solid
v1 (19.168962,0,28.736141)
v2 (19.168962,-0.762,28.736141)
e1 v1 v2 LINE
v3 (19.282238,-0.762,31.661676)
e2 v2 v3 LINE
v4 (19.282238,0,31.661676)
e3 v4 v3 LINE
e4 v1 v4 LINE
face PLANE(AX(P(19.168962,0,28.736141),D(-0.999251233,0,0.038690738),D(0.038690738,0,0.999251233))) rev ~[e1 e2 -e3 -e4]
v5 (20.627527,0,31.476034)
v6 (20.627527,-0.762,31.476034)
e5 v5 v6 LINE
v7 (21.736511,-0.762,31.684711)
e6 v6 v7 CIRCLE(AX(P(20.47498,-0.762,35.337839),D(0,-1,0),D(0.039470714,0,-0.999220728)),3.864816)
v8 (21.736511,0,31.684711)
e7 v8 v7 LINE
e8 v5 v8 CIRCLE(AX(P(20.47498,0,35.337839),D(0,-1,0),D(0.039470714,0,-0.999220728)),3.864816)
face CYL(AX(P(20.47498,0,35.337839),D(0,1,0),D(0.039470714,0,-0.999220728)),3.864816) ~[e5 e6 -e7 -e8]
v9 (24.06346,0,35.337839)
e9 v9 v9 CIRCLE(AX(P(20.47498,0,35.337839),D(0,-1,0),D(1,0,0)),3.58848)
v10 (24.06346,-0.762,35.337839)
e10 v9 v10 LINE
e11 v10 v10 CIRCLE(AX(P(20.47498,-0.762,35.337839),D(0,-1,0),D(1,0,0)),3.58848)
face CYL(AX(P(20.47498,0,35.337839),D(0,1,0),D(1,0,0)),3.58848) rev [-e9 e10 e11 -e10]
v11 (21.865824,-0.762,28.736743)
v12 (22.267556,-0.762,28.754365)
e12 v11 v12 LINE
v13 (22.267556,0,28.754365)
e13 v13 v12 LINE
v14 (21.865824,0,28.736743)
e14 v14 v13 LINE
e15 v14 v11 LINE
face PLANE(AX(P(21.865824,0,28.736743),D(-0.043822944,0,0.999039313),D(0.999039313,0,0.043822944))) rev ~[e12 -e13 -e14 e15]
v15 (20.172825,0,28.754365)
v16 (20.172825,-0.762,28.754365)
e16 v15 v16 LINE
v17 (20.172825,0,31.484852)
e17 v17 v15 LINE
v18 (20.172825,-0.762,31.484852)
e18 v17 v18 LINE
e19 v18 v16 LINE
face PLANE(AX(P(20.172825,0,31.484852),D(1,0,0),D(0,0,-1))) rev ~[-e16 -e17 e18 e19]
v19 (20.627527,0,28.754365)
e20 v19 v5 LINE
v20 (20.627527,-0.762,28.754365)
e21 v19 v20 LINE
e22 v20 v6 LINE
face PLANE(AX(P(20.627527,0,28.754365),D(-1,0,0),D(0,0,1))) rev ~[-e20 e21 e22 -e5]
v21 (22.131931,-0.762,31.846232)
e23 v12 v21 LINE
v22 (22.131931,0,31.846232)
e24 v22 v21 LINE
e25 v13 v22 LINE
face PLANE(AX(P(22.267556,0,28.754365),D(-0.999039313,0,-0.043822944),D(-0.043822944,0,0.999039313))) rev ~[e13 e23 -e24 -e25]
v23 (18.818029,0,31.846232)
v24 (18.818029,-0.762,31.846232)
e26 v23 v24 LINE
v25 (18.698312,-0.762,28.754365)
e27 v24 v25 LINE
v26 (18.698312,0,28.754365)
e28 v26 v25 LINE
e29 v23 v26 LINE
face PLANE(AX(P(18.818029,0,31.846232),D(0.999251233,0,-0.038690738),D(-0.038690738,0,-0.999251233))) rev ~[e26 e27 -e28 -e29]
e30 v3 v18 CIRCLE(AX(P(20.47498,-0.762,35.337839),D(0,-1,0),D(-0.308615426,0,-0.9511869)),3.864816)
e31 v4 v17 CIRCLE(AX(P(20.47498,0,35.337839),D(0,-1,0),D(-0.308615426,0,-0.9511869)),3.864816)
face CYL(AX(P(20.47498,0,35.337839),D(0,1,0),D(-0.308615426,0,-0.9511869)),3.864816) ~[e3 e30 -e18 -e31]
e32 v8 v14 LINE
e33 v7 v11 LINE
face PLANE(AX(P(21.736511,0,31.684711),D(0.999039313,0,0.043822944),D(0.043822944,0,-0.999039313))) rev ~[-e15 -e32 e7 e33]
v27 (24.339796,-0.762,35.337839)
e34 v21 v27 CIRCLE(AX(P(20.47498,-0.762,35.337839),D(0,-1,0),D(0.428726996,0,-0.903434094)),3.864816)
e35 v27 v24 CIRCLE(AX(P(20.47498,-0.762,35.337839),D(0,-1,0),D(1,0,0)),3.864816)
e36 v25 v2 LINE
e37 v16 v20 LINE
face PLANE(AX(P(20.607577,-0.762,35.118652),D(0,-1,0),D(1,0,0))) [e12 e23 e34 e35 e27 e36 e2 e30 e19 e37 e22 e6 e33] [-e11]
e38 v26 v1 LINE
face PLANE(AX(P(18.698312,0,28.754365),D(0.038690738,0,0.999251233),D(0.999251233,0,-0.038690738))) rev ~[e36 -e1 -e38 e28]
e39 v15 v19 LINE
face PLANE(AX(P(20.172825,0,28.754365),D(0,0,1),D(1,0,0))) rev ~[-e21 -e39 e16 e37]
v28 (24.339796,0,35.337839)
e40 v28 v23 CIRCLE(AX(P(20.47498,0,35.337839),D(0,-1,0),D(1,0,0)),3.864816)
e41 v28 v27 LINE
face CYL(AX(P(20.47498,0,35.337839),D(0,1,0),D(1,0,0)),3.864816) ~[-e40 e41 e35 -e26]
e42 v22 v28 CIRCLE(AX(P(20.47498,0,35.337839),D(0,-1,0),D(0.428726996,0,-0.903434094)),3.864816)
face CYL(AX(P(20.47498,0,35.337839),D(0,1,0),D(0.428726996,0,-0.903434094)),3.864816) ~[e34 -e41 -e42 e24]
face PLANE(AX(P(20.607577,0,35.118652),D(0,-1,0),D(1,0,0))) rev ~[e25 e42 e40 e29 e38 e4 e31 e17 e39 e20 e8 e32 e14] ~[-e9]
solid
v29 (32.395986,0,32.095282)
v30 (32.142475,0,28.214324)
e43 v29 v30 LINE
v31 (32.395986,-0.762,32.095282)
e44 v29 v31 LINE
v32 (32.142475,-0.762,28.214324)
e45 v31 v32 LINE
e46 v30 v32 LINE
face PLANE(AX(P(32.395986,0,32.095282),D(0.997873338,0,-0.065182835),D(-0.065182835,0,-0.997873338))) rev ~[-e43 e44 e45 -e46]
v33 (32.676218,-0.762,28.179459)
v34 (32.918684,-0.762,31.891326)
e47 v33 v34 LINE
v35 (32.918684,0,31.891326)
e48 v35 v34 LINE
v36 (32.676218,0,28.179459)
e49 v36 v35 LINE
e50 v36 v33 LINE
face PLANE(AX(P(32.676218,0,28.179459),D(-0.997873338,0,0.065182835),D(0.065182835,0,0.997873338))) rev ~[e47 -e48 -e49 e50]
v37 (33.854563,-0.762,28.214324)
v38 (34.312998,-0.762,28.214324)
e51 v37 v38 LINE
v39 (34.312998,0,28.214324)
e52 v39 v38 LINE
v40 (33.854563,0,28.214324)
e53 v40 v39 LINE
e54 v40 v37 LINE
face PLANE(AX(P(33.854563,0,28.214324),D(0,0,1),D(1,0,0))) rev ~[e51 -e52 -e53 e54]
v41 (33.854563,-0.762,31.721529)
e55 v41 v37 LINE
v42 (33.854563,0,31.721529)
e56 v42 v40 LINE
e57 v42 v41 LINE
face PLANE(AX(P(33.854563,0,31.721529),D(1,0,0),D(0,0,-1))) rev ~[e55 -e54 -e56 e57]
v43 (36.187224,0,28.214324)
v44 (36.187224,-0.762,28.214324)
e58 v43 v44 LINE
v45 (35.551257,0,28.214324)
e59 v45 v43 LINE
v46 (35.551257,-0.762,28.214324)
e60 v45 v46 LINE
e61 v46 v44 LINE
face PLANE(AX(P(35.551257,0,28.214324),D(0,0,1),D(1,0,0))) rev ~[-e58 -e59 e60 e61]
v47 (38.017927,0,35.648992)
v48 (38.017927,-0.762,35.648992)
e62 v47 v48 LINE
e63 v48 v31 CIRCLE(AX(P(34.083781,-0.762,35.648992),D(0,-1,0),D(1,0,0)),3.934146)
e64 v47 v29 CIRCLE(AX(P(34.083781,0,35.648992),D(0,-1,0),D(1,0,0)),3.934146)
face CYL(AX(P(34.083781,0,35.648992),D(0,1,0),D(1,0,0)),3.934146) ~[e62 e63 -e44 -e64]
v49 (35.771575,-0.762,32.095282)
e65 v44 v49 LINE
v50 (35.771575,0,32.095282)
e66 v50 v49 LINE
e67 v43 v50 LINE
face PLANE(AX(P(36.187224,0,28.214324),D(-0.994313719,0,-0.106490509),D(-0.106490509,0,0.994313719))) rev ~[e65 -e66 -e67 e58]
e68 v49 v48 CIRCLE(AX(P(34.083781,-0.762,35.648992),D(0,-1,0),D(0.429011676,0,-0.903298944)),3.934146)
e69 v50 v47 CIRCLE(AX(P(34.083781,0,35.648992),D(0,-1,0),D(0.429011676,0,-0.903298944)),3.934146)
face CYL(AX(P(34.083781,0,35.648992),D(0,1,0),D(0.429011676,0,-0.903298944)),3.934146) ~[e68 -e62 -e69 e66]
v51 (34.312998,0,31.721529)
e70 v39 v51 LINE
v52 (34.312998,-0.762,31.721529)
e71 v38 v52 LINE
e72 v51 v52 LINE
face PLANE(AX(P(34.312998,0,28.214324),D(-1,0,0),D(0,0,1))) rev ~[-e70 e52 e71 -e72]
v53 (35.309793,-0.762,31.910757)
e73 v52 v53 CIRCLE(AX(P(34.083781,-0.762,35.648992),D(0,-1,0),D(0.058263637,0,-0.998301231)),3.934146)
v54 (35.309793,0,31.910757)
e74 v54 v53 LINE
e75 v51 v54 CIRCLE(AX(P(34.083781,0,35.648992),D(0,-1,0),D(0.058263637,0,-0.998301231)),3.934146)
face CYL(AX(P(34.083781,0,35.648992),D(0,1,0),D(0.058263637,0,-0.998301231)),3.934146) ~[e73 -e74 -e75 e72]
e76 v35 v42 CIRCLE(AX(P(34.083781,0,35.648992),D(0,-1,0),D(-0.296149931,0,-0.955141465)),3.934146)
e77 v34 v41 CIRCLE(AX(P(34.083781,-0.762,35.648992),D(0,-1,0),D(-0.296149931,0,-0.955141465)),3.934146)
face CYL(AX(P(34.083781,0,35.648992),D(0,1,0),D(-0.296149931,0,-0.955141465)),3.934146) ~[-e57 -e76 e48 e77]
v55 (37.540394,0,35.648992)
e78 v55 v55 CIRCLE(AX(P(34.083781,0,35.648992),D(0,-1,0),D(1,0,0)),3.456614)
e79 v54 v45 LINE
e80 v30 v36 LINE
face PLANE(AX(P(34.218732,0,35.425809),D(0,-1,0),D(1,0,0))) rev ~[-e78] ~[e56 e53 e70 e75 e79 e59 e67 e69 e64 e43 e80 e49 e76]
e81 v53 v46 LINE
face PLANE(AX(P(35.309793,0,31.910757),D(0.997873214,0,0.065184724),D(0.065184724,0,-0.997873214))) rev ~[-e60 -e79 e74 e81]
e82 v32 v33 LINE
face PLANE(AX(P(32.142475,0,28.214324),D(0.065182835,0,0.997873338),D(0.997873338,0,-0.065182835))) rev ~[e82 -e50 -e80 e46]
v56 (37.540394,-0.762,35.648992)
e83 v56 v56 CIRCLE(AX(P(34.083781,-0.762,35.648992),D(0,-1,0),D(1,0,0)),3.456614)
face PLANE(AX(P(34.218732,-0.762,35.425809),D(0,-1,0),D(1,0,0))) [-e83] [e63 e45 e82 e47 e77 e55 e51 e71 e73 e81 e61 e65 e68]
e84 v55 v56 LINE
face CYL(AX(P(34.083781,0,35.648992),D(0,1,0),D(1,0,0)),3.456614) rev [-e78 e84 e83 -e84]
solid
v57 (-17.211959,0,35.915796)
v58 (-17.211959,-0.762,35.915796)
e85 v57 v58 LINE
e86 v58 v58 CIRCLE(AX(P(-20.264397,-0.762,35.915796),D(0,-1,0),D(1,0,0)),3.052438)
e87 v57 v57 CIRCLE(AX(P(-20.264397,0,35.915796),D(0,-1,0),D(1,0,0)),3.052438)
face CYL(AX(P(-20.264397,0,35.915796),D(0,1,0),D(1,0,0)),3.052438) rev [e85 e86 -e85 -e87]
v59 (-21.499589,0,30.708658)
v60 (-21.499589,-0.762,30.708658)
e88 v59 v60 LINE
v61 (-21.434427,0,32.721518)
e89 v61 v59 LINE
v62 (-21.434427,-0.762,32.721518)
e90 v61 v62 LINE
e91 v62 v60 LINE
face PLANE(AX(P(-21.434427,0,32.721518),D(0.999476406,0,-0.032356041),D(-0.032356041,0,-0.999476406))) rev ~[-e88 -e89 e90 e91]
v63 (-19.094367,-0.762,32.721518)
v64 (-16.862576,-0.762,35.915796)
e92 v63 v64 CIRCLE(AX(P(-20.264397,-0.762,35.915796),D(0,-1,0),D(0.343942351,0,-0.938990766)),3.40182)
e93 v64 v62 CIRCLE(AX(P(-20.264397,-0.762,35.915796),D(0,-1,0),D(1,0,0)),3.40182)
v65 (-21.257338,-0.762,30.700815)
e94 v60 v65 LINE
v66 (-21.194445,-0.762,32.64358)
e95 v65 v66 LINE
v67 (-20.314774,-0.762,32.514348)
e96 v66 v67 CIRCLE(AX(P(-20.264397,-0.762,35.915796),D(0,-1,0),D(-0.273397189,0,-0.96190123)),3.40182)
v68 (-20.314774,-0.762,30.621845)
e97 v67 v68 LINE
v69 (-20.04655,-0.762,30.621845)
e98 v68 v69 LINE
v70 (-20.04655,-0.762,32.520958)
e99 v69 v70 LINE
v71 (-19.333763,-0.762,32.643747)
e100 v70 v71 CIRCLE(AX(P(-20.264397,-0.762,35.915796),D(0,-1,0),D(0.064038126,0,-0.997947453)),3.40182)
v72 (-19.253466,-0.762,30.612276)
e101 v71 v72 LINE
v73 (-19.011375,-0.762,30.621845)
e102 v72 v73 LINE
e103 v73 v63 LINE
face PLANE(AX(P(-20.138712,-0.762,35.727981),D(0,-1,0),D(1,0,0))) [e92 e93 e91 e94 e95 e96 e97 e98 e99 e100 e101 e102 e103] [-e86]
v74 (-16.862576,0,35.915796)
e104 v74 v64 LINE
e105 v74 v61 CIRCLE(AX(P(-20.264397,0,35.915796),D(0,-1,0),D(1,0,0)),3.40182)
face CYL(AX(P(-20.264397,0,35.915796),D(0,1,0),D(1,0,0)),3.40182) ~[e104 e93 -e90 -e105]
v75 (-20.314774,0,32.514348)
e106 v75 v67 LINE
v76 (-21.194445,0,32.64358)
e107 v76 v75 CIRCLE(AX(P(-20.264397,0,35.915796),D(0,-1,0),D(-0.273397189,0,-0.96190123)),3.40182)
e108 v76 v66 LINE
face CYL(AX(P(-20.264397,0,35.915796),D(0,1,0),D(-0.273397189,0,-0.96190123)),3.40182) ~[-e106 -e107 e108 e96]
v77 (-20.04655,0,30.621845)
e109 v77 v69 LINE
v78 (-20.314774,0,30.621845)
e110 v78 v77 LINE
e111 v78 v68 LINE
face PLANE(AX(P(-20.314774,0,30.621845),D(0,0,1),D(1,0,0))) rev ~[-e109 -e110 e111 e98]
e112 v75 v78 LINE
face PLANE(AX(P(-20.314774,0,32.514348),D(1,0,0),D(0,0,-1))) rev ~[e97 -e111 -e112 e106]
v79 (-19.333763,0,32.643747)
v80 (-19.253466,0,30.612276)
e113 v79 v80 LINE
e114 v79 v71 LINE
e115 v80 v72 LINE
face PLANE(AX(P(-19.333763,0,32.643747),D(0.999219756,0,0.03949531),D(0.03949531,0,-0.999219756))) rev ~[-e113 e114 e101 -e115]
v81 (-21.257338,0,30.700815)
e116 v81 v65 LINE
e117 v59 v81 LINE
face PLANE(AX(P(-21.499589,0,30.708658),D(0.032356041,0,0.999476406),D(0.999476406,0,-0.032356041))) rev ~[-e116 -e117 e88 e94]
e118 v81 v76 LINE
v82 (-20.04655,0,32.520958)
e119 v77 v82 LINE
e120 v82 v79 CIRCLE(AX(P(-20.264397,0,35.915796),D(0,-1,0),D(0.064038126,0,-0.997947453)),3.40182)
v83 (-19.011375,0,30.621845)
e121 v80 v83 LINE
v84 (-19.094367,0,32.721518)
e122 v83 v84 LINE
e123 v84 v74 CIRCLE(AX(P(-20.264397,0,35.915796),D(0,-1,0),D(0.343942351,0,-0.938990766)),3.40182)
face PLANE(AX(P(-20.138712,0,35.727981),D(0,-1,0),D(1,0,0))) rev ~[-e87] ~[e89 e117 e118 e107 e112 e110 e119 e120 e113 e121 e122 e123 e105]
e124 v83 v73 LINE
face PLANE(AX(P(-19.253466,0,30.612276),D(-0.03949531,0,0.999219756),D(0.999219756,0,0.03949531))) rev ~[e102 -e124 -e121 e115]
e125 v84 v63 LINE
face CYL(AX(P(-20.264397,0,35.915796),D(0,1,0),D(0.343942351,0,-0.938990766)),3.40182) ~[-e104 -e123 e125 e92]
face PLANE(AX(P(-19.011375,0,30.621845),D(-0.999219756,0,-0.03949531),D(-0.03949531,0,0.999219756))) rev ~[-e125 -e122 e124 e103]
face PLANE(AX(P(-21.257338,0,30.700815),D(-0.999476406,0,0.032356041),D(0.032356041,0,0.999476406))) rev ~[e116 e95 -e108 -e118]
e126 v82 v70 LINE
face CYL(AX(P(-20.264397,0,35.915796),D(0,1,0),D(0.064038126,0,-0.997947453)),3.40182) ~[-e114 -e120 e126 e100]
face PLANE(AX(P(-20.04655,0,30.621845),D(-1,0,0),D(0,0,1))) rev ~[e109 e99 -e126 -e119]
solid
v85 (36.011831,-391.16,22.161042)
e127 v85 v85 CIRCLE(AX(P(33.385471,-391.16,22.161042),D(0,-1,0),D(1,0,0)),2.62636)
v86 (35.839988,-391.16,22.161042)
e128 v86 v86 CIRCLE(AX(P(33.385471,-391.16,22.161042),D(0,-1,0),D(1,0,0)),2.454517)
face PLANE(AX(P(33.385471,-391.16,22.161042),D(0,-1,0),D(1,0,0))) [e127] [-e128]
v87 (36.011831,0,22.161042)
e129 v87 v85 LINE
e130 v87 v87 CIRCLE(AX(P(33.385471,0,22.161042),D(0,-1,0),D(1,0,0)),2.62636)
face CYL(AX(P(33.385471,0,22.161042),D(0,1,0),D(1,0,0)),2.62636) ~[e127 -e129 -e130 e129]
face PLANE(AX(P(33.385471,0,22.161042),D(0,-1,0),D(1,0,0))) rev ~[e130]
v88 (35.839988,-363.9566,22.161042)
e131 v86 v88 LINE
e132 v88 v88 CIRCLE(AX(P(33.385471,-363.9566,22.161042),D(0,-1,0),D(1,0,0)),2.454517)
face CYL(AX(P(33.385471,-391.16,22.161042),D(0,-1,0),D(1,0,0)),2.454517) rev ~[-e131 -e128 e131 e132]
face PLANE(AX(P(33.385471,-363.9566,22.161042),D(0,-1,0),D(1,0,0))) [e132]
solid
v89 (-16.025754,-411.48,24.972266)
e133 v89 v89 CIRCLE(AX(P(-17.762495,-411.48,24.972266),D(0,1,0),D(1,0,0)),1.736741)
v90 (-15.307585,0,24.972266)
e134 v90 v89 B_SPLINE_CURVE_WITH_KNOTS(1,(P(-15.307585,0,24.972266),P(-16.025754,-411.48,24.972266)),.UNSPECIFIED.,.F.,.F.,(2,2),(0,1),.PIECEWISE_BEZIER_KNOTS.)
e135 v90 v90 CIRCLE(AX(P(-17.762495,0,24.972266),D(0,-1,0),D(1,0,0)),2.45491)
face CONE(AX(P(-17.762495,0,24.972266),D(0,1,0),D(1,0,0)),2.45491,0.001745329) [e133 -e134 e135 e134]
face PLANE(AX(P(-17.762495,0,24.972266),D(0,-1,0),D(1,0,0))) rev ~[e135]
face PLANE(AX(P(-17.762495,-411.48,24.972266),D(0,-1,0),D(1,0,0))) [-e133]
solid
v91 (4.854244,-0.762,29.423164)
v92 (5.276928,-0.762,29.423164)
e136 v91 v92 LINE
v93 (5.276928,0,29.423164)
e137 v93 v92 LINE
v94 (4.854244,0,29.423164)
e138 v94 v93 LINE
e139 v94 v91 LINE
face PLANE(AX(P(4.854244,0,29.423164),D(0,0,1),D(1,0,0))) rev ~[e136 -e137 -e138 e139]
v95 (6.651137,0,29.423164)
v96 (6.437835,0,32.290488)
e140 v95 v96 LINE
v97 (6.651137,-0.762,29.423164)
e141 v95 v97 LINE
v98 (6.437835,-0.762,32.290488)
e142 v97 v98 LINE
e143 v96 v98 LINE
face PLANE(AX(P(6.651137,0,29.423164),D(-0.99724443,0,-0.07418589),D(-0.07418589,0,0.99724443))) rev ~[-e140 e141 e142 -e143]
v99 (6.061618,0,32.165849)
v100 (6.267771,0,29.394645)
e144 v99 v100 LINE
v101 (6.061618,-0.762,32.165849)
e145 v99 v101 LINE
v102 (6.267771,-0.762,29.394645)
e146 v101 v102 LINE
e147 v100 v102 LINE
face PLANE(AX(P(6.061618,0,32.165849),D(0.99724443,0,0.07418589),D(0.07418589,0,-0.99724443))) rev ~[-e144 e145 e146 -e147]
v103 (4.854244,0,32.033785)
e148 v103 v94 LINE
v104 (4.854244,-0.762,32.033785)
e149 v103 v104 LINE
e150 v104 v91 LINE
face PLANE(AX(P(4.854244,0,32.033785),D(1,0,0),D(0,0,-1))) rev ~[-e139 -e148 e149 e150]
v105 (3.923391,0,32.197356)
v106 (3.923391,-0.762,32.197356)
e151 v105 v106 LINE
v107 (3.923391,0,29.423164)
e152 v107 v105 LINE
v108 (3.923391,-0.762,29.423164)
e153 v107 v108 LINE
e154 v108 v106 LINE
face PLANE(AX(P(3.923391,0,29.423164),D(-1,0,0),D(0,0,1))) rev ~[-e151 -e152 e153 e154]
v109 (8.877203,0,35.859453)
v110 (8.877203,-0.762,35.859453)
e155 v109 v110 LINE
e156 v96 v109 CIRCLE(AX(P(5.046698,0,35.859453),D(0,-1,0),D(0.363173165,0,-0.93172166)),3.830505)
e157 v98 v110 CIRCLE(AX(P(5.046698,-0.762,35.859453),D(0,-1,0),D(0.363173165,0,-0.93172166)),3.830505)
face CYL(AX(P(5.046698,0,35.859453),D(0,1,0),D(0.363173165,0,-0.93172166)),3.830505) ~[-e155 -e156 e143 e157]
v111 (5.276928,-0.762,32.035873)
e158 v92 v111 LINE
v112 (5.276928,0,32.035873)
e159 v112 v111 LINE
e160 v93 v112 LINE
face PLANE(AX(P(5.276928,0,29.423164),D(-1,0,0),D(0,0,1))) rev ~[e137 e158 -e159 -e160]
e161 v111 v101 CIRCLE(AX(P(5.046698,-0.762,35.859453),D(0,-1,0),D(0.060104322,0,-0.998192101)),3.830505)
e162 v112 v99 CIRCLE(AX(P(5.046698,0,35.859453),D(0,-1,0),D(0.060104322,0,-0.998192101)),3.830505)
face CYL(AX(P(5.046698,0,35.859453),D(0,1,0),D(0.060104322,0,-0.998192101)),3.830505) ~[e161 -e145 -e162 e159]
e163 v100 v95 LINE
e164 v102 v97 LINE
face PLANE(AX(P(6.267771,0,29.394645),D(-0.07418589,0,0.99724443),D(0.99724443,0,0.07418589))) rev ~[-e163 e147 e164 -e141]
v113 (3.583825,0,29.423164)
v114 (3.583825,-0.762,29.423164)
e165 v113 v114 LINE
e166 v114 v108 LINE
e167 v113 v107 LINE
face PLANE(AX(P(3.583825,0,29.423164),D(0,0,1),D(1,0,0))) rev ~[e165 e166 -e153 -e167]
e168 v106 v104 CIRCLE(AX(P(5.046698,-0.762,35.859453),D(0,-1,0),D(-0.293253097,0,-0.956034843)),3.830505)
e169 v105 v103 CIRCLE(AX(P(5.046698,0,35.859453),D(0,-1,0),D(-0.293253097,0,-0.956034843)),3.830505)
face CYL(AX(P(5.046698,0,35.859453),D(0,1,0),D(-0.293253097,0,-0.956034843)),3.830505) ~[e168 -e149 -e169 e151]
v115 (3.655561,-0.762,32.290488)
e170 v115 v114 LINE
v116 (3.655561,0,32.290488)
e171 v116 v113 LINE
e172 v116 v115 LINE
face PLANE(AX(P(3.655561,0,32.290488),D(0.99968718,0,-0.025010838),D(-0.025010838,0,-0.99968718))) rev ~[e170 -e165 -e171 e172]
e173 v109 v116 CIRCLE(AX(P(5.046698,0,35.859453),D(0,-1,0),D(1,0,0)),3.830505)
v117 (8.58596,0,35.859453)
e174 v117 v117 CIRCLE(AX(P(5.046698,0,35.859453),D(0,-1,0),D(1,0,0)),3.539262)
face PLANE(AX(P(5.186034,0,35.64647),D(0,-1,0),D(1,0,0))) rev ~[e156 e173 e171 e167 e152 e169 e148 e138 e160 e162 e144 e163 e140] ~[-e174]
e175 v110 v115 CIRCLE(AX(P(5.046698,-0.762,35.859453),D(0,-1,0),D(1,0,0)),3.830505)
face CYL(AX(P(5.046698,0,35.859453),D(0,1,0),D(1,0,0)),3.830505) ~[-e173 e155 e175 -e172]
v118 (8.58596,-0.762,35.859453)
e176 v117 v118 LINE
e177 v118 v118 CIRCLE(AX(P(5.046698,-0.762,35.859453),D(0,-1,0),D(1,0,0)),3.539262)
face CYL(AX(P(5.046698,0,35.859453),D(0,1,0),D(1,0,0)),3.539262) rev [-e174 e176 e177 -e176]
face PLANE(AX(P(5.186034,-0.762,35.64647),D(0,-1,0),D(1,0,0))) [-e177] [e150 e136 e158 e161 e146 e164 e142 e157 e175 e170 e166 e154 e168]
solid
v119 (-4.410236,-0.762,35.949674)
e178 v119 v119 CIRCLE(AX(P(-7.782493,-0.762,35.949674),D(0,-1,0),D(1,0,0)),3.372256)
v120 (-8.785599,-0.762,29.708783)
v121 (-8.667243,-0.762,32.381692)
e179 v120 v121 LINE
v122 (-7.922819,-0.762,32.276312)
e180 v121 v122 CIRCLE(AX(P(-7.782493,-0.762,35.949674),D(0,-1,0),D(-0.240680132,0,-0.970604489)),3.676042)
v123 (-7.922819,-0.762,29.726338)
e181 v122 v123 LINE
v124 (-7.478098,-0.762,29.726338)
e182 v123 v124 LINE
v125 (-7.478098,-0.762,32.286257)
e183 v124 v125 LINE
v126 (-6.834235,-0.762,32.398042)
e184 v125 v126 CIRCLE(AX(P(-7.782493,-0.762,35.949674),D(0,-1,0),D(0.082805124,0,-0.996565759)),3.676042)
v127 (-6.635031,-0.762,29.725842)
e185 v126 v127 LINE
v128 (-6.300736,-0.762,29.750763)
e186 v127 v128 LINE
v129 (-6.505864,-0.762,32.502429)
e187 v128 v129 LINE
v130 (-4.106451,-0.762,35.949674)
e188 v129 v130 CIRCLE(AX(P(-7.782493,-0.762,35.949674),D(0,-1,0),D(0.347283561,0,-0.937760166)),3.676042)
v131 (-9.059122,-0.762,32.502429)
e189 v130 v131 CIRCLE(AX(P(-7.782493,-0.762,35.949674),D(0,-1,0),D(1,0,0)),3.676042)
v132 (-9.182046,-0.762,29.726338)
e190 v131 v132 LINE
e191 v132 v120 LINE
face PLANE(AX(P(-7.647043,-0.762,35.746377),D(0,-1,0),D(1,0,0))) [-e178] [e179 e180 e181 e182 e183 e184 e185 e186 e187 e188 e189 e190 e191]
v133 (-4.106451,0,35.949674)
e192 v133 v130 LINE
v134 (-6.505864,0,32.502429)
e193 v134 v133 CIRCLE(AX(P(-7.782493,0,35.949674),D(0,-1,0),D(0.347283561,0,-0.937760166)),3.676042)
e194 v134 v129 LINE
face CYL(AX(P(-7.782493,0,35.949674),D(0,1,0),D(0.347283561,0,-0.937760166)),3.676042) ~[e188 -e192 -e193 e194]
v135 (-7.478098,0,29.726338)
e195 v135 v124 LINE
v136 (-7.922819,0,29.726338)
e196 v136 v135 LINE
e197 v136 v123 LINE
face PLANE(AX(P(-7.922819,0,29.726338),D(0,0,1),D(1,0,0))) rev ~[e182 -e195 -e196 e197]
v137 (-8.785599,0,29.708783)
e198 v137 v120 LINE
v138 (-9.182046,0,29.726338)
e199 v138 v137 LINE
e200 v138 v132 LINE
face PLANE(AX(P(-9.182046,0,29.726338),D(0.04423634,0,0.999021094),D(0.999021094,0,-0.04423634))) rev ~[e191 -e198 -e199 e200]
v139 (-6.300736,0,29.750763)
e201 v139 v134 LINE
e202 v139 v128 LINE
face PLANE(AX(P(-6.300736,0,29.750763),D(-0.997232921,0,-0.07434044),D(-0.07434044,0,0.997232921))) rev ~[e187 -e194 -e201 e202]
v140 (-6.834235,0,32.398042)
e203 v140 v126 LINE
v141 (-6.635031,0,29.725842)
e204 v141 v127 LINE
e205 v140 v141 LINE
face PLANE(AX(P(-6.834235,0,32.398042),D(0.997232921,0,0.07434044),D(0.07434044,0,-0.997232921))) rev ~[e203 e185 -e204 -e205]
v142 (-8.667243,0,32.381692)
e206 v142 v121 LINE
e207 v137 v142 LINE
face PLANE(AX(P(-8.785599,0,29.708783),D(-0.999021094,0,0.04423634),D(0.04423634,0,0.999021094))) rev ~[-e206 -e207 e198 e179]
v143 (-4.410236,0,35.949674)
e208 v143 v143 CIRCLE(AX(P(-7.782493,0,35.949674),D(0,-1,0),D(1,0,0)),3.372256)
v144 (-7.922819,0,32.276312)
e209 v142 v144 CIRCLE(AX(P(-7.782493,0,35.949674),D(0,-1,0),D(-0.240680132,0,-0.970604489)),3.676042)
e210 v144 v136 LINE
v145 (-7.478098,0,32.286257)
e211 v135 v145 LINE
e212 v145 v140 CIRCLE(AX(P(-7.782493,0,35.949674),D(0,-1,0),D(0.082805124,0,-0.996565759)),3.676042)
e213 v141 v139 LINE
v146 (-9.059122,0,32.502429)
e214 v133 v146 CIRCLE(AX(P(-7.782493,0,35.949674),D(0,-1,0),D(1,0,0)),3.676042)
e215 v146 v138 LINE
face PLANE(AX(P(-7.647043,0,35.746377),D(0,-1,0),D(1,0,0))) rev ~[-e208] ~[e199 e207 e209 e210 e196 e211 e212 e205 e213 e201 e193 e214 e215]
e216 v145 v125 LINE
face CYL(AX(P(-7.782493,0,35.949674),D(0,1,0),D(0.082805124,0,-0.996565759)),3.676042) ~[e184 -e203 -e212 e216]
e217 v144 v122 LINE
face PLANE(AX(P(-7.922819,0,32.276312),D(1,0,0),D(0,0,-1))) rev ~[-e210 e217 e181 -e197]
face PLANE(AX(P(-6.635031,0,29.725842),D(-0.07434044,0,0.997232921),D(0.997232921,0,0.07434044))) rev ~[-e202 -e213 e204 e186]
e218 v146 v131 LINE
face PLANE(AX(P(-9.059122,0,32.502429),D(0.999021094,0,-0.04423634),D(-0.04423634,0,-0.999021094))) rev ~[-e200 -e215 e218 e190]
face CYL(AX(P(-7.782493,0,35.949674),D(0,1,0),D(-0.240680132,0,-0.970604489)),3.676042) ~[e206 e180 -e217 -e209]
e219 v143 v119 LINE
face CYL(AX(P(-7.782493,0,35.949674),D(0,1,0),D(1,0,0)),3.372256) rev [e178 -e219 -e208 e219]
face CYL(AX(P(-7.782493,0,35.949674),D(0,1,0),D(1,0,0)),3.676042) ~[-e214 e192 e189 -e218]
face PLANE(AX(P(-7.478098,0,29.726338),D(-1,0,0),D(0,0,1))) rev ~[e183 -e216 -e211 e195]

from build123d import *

# Parameters (mm, degrees)
F0_R      = 2.62636
F1_DEPTH  = 391.16
F2_R      = 2.4545174693
F3_DEPTH  = 27.2034
F4_R      = 2.45491
F5_DEPTH  = 411.48
F5_TAPER  = 0.1
F6_R      = 3.4566135919
F7_DEPTH  = 0.762
F8_DEPTH  = 0.762
F9_R      = 3.5884802504
F10_DEPTH = 0.762
F11_R     = 3.5392622184
F12_DEPTH = 0.762
F13_R     = 3.3722563351
F14_DEPTH = 0.762
F15_R     = 3.0524378361
F16_DEPTH = 0.762


# Not quite as in the source:
# - a feature names something its author has since deleted; it is built from what else it names


with BuildPart() as f1:
    # F0 (on Front) → F1 (new body)
    with BuildSketch(Plane.XZ):
        with Locations((33.3854705095, 22.1610423177)):
            Circle(F0_R)
    extrude(amount=F1_DEPTH)

    # F2 (on face) → F3 (cut)
    with BuildSketch(Plane.XZ.offset(391.16)):
        with Locations((33.3854705095, 22.1610423177)):
            Circle(F2_R)
    extrude(amount=-F3_DEPTH, mode=Mode.SUBTRACT)


with BuildPart() as f5:
    # F4 (on Front) → F5 (new body)
    with BuildSketch(Plane.XZ):
        with Locations((-17.7624952048, 24.9722655863)):
            Circle(F4_R)
    extrude(amount=F5_DEPTH, taper=F5_TAPER)


with BuildPart() as f7:
    # F6 (on Front) → F7 (new body)
    with BuildSketch(Plane.XZ):
        with BuildLine():
            ThreePointArc((35.7715754489, 32.0952818217), (37.4092534584, 33.5469125299), (38.0179269561, 35.6489918694))
            ThreePointArc((38.0179269561, 35.6489918694), (31.9817014824, 38.974464506), (32.3959861948, 32.0952818217))
            ThreePointArc((32.3959861948, 32.0952818217), (32.6536943465, 31.9839736594), (32.9186837167, 31.8913257664))
            ThreePointArc((32.9186837167, 31.8913257664), (33.3814730836, 31.7780398357), (33.8545631583, 31.7215289391))
            ThreePointArc((33.8545631583, 31.7215289391), (34.0837808218, 31.7148457351), (34.3129984853, 31.7215289391))
            ThreePointArc((34.3129984853, 31.7215289391), (34.817521405, 31.783874722), (35.3097929415, 31.91075698))
            ThreePointArc((35.3097929415, 31.91075698), (35.5436026581, 31.9957158036), (35.7715754489, 32.0952818217))
        make_face()
        with Locations((34.0837808218, 35.6489918694)):
            Circle(F6_R, mode=Mode.SUBTRACT)
    extrude(amount=F7_DEPTH)

    # F6 (on Front) → F8 (join)
    with BuildSketch(Plane.XZ):
        with BuildLine():
            ThreePointArc((35.7715754489, 32.0952818217), (37.4092534584, 33.5469125299), (38.0179269561, 35.6489918694))
            ThreePointArc((38.0179269561, 35.6489918694), (31.9817014824, 38.974464506), (32.3959861948, 32.0952818217))
            ThreePointArc((32.3959861948, 32.0952818217), (32.6536943465, 31.9839736594), (32.9186837167, 31.8913257664))
            ThreePointArc((32.9186837167, 31.8913257664), (33.3814730836, 31.7780398357), (33.8545631583, 31.7215289391))
            ThreePointArc((33.8545631583, 31.7215289391), (34.0837808218, 31.7148457351), (34.3129984853, 31.7215289391))
            ThreePointArc((34.3129984853, 31.7215289391), (34.817521405, 31.783874722), (35.3097929415, 31.91075698))
            ThreePointArc((35.3097929415, 31.91075698), (35.5436026581, 31.9957158036), (35.7715754489, 32.0952818217))
        make_face()
        with Locations((34.0837808218, 35.6489918694)):
            Circle(F6_R, mode=Mode.SUBTRACT)
        with BuildLine():
            ThreePointArc((32.9186837167, 31.8913257664), (32.6536943465, 31.9839736594), (32.3959861948, 32.0952818217))
            Line((32.3959861948, 32.0952818217), (32.1424752474, 28.2143242631))
            Line((32.1424752474, 28.2143242631), (32.6762180922, 28.1794592453))
            Line((32.6762180922, 28.1794592453), (32.9186837167, 31.8913257664))
        make_face()
        with BuildLine():
            ThreePointArc((34.3129984853, 31.7215289391), (34.0837808218, 31.7148457351), (33.8545631583, 31.7215289391))
            Line((33.8545631583, 31.7215289391), (33.8545631583, 28.2143242631))
            Line((33.8545631583, 28.2143242631), (34.3129984853, 28.2143242631))
            Line((34.3129984853, 28.2143242631), (34.3129984853, 31.7215289391))
        make_face()
        with BuildLine():
            Line((36.1872240901, 28.2143242631), (35.7715754489, 32.0952818217))
            ThreePointArc((35.7715754489, 32.0952818217), (35.5436026581, 31.9957158036), (35.3097929415, 31.91075698))
            Line((35.3097929415, 31.91075698), (35.5512574315, 28.2143242631))
            Line((35.5512574315, 28.2143242631), (36.1872240901, 28.2143242631))
        make_face()
    extrude(amount=F8_DEPTH)


with BuildPart() as f10:
    # F9 (on Front) → F10 (new body)
    with BuildSketch(Plane.XZ):
        with BuildLine():
            ThreePointArc((22.1319308048, 31.8462318345), (23.7415235219, 33.2722886782), (24.3397960437, 35.3378386838))
            ThreePointArc((24.3397960437, 35.3378386838), (18.4094296981, 38.6043825019), (18.8180286027, 31.8462318345))
            ThreePointArc((18.8180286027, 31.8462318345), (19.0471481942, 31.7464458452), (19.282237764, 31.6616760097))
            ThreePointArc((19.282237764, 31.6616760097), (19.7223206629, 31.5470195494), (20.1728250831, 31.4848518))
            ThreePointArc((20.1728250831, 31.4848518), (20.4000461089, 31.473748843), (20.6275267627, 31.476034088))
            ThreePointArc((20.6275267627, 31.476034088), (21.1896761466, 31.5396793486), (21.736511169, 31.6847107496))
            ThreePointArc((21.736511169, 31.6847107496), (21.9364540921, 31.7600044292), (22.1319308048, 31.8462318345))
        make_face()
        with Locations((20.4749797037, 35.3378386838)):
            Circle(F9_R, mode=Mode.SUBTRACT)
        with BuildLine():
            Line((22.267555818, 28.7543646982), (22.1319308048, 31.8462318345))
            ThreePointArc((22.1319308048, 31.8462318345), (21.9364540921, 31.7600044292), (21.736511169, 31.6847107496))
            Line((21.736511169, 31.6847107496), (21.8658240366, 28.7367426996))
            Line((21.8658240366, 28.7367426996), (22.267555818, 28.7543646982))
        make_face()
        with BuildLine():
            ThreePointArc((20.6275267627, 31.476034088), (20.4000461089, 31.473748843), (20.1728250831, 31.4848518))
            Line((20.1728250831, 31.4848518), (20.1728250831, 28.7543646982))
            Line((20.1728250831, 28.7543646982), (20.6275267627, 28.7543646982))
            Line((20.6275267627, 28.7543646982), (20.6275267627, 31.476034088))
        make_face()
        with BuildLine():
            ThreePointArc((19.282237764, 31.6616760097), (19.0471481942, 31.7464458452), (18.8180286027, 31.8462318345))
            Line((18.8180286027, 31.8462318345), (18.6983123422, 28.7543646982))
            Line((18.6983123422, 28.7543646982), (19.1689618492, 28.7361412764))
            Line((19.1689618492, 28.7361412764), (19.282237764, 31.6616760097))
        make_face()
    extrude(amount=F10_DEPTH)


with BuildPart() as f12:
    # F11 (on Front) → F12 (new body)
    with BuildSketch(Plane.XZ):
        with BuildLine():
            ThreePointArc((6.4378347425, 32.2904881093), (8.2090963798, 33.6979702133), (8.8772032465, 35.8594527775))
            ThreePointArc((8.8772032465, 35.8594527775), (2.8852154776, 39.0218511155), (3.6555613411, 32.2904881093))
            ThreePointArc((3.6555613411, 32.2904881093), (3.7886138591, 32.2414430605), (3.9233905263, 32.1973563357))
            ThreePointArc((3.9233905263, 32.1973563357), (4.3837529644, 32.0867516301), (4.8542437144, 32.0337853253))
            ThreePointArc((4.8542437144, 32.0337853253), (5.0656146513, 32.0289942821), (5.2769279587, 32.0358727393))
            ThreePointArc((5.2769279587, 32.0358727393), (5.6726558311, 32.0804387567), (6.0616182074, 32.165849228))
            ThreePointArc((6.0616182074, 32.165849228), (6.2513395336, 32.223299728), (6.4378347425, 32.2904881093))
        make_face()
        with Locations((5.0466980418, 35.8594527775)):
            Circle(F11_R, mode=Mode.SUBTRACT)
        with BuildLine():
            ThreePointArc((5.2769279587, 32.0358727393), (5.0656146513, 32.0289942821), (4.8542437144, 32.0337853253))
            Line((4.8542437144, 32.0337853253), (4.8542437144, 29.4231642021))
            Line((4.8542437144, 29.4231642021), (5.2769279587, 29.4231642021))
            Line((5.2769279587, 29.4231642021), (5.2769279587, 32.0358727393))
        make_face()
        with BuildLine():
            ThreePointArc((3.9233905263, 32.1973563357), (3.7886138591, 32.2414430605), (3.6555613411, 32.2904881093))
            Line((3.6555613411, 32.2904881093), (3.5838247277, 29.4231642021))
            Line((3.5838247277, 29.4231642021), (3.9233905263, 29.4231642021))
            Line((3.9233905263, 29.4231642021), (3.9233905263, 32.1973563357))
        make_face()
        with BuildLine():
            Line((6.6511374898, 29.4231642021), (6.4378347425, 32.2904881093))
            ThreePointArc((6.4378347425, 32.2904881093), (6.2513395336, 32.223299728), (6.0616182074, 32.165849228))
            Line((6.0616182074, 32.165849228), (6.2677705127, 29.3946451955))
            Line((6.2677705127, 29.3946451955), (6.6511374898, 29.4231642021))
        make_face()
    extrude(amount=F12_DEPTH)


with BuildPart() as f14:
    # F13 (on Front) → F14 (new body)
    with BuildSketch(Plane.XZ):
        with BuildLine():
            ThreePointArc((-6.5058638968, 32.5024286839), (-4.7653563145, 33.8496335486), (-4.1064509287, 35.9496743303))
            ThreePointArc((-4.1064509287, 35.9496743303), (-9.882533595, 38.9668108291), (-9.0591217298, 32.5024286839))
            ThreePointArc((-9.0591217298, 32.5024286839), (-8.8648672093, 32.4365916947), (-8.667243059, 32.3816915753))
            ThreePointArc((-8.667243059, 32.3816915753), (-8.2977321652, 32.3099198952), (-7.9228188843, 32.2763117657))
            ThreePointArc((-7.9228188843, 32.2763117657), (-7.7003077273, 32.2745512645), (-7.4780977065, 32.2862568607))
            ThreePointArc((-7.4780977065, 32.2862568607), (-7.1536774965, 32.3278135882), (-6.8342351877, 32.3980421122))
            ThreePointArc((-6.8342351877, 32.3980421122), (-6.6688258207, 32.4463859084), (-6.5058638968, 32.5024286839))
        make_face()
        with Locations((-7.7824928133, 35.9496743303)):
            Circle(F13_R, mode=Mode.SUBTRACT)
        with BuildLine():
            ThreePointArc((-7.4780977065, 32.2862568607), (-7.7003077273, 32.2745512645), (-7.9228188843, 32.2763117657))
            Line((-7.9228188843, 32.2763117657), (-7.9228188843, 29.7263376413))
            Line((-7.9228188843, 29.7263376413), (-7.4780977065, 29.7263376413))
            Line((-7.4780977065, 29.7263376413), (-7.4780977065, 32.2862568607))
        make_face()
        with BuildLine():
            ThreePointArc((-8.667243059, 32.3816915753), (-8.8648672093, 32.4365916947), (-9.0591217298, 32.5024286839))
            Line((-9.0591217298, 32.5024286839), (-9.1820461676, 29.7263376413))
            Line((-9.1820461676, 29.7263376413), (-8.7855986065, 29.7087830681))
            Line((-8.7855986065, 29.7087830681), (-8.667243059, 32.3816915753))
        make_face()
        with BuildLine():
            Line((-6.3007362187, 29.7507625073), (-6.5058638968, 32.5024286839))
            ThreePointArc((-6.5058638968, 32.5024286839), (-6.6688258207, 32.4463859084), (-6.8342351877, 32.3980421122))
            Line((-6.8342351877, 32.3980421122), (-6.6350314361, 29.7258418966))
            Line((-6.6350314361, 29.7258418966), (-6.3007362187, 29.7507625073))
        make_face()
    extrude(amount=F14_DEPTH)


with BuildPart() as f16:
    # F15 (on Front) → F16 (new body)
    with BuildSketch(Plane.XZ):
        with BuildLine():
            ThreePointArc((-19.0943665325, 32.7215177714), (-17.4757935329, 33.9674438978), (-16.8625762084, 35.9157957603))
            ThreePointArc((-16.8625762084, 35.9157957603), (-22.2127485191, 38.7043988839), (-21.4344267806, 32.7215177714))
            ThreePointArc((-21.4344267806, 32.7215177714), (-21.3151586387, 32.6803233654), (-21.1944448053, 32.6435804859))
            ThreePointArc((-21.1944448053, 32.6435804859), (-20.7588494348, 32.5501013578), (-20.3147735447, 32.5143483433))
            ThreePointArc((-20.3147735447, 32.5143483433), (-20.1805968117, 32.5150076241), (-20.046550451, 32.5209577094))
            ThreePointArc((-20.046550451, 32.5209577094), (-19.686883893, 32.5633546543), (-19.3337626727, 32.643747052))
            ThreePointArc((-19.3337626727, 32.643747052), (-19.2133450428, 32.6804174414), (-19.0943665325, 32.7215177714))
        make_face()
        with Locations((-20.2643966565, 35.9157957603)):
            Circle(F15_R, mode=Mode.SUBTRACT)
        with BuildLine():
            ThreePointArc((-20.046550451, 32.5209577094), (-20.1805968117, 32.5150076241), (-20.3147735447, 32.5143483433))
            Line((-20.3147735447, 32.5143483433), (-20.3147735447, 30.6218452734))
            Line((-20.3147735447, 30.6218452734), (-20.046550451, 30.6218452734))
            Line((-20.046550451, 30.6218452734), (-20.046550451, 32.5209577094))
        make_face()
        with BuildLine():
            ThreePointArc((-21.1944448053, 32.6435804859), (-21.3151586387, 32.6803233654), (-21.4344267806, 32.7215177714))
            Line((-21.4344267806, 32.7215177714), (-21.4995890856, 30.7086575776))
            Line((-21.4995890856, 30.7086575776), (-21.2573379291, 30.7008151831))
            Line((-21.2573379291, 30.7008151831), (-21.1944448053, 32.6435804859))
        make_face()
        with BuildLine():
            Line((-19.011374563, 30.6218452734), (-19.0943665325, 32.7215177714))
            ThreePointArc((-19.0943665325, 32.7215177714), (-19.2133450428, 32.6804174414), (-19.3337626727, 32.643747052))
            Line((-19.3337626727, 32.643747052), (-19.2534664561, 30.612276313))
            Line((-19.2534664561, 30.612276313), (-19.011374563, 30.6218452734))
        make_face()
    extrude(amount=F16_DEPTH)


solid = Compound([f1.part, f5.part, f7.part, f10.part, f12.part, f14.part, f16.part])
